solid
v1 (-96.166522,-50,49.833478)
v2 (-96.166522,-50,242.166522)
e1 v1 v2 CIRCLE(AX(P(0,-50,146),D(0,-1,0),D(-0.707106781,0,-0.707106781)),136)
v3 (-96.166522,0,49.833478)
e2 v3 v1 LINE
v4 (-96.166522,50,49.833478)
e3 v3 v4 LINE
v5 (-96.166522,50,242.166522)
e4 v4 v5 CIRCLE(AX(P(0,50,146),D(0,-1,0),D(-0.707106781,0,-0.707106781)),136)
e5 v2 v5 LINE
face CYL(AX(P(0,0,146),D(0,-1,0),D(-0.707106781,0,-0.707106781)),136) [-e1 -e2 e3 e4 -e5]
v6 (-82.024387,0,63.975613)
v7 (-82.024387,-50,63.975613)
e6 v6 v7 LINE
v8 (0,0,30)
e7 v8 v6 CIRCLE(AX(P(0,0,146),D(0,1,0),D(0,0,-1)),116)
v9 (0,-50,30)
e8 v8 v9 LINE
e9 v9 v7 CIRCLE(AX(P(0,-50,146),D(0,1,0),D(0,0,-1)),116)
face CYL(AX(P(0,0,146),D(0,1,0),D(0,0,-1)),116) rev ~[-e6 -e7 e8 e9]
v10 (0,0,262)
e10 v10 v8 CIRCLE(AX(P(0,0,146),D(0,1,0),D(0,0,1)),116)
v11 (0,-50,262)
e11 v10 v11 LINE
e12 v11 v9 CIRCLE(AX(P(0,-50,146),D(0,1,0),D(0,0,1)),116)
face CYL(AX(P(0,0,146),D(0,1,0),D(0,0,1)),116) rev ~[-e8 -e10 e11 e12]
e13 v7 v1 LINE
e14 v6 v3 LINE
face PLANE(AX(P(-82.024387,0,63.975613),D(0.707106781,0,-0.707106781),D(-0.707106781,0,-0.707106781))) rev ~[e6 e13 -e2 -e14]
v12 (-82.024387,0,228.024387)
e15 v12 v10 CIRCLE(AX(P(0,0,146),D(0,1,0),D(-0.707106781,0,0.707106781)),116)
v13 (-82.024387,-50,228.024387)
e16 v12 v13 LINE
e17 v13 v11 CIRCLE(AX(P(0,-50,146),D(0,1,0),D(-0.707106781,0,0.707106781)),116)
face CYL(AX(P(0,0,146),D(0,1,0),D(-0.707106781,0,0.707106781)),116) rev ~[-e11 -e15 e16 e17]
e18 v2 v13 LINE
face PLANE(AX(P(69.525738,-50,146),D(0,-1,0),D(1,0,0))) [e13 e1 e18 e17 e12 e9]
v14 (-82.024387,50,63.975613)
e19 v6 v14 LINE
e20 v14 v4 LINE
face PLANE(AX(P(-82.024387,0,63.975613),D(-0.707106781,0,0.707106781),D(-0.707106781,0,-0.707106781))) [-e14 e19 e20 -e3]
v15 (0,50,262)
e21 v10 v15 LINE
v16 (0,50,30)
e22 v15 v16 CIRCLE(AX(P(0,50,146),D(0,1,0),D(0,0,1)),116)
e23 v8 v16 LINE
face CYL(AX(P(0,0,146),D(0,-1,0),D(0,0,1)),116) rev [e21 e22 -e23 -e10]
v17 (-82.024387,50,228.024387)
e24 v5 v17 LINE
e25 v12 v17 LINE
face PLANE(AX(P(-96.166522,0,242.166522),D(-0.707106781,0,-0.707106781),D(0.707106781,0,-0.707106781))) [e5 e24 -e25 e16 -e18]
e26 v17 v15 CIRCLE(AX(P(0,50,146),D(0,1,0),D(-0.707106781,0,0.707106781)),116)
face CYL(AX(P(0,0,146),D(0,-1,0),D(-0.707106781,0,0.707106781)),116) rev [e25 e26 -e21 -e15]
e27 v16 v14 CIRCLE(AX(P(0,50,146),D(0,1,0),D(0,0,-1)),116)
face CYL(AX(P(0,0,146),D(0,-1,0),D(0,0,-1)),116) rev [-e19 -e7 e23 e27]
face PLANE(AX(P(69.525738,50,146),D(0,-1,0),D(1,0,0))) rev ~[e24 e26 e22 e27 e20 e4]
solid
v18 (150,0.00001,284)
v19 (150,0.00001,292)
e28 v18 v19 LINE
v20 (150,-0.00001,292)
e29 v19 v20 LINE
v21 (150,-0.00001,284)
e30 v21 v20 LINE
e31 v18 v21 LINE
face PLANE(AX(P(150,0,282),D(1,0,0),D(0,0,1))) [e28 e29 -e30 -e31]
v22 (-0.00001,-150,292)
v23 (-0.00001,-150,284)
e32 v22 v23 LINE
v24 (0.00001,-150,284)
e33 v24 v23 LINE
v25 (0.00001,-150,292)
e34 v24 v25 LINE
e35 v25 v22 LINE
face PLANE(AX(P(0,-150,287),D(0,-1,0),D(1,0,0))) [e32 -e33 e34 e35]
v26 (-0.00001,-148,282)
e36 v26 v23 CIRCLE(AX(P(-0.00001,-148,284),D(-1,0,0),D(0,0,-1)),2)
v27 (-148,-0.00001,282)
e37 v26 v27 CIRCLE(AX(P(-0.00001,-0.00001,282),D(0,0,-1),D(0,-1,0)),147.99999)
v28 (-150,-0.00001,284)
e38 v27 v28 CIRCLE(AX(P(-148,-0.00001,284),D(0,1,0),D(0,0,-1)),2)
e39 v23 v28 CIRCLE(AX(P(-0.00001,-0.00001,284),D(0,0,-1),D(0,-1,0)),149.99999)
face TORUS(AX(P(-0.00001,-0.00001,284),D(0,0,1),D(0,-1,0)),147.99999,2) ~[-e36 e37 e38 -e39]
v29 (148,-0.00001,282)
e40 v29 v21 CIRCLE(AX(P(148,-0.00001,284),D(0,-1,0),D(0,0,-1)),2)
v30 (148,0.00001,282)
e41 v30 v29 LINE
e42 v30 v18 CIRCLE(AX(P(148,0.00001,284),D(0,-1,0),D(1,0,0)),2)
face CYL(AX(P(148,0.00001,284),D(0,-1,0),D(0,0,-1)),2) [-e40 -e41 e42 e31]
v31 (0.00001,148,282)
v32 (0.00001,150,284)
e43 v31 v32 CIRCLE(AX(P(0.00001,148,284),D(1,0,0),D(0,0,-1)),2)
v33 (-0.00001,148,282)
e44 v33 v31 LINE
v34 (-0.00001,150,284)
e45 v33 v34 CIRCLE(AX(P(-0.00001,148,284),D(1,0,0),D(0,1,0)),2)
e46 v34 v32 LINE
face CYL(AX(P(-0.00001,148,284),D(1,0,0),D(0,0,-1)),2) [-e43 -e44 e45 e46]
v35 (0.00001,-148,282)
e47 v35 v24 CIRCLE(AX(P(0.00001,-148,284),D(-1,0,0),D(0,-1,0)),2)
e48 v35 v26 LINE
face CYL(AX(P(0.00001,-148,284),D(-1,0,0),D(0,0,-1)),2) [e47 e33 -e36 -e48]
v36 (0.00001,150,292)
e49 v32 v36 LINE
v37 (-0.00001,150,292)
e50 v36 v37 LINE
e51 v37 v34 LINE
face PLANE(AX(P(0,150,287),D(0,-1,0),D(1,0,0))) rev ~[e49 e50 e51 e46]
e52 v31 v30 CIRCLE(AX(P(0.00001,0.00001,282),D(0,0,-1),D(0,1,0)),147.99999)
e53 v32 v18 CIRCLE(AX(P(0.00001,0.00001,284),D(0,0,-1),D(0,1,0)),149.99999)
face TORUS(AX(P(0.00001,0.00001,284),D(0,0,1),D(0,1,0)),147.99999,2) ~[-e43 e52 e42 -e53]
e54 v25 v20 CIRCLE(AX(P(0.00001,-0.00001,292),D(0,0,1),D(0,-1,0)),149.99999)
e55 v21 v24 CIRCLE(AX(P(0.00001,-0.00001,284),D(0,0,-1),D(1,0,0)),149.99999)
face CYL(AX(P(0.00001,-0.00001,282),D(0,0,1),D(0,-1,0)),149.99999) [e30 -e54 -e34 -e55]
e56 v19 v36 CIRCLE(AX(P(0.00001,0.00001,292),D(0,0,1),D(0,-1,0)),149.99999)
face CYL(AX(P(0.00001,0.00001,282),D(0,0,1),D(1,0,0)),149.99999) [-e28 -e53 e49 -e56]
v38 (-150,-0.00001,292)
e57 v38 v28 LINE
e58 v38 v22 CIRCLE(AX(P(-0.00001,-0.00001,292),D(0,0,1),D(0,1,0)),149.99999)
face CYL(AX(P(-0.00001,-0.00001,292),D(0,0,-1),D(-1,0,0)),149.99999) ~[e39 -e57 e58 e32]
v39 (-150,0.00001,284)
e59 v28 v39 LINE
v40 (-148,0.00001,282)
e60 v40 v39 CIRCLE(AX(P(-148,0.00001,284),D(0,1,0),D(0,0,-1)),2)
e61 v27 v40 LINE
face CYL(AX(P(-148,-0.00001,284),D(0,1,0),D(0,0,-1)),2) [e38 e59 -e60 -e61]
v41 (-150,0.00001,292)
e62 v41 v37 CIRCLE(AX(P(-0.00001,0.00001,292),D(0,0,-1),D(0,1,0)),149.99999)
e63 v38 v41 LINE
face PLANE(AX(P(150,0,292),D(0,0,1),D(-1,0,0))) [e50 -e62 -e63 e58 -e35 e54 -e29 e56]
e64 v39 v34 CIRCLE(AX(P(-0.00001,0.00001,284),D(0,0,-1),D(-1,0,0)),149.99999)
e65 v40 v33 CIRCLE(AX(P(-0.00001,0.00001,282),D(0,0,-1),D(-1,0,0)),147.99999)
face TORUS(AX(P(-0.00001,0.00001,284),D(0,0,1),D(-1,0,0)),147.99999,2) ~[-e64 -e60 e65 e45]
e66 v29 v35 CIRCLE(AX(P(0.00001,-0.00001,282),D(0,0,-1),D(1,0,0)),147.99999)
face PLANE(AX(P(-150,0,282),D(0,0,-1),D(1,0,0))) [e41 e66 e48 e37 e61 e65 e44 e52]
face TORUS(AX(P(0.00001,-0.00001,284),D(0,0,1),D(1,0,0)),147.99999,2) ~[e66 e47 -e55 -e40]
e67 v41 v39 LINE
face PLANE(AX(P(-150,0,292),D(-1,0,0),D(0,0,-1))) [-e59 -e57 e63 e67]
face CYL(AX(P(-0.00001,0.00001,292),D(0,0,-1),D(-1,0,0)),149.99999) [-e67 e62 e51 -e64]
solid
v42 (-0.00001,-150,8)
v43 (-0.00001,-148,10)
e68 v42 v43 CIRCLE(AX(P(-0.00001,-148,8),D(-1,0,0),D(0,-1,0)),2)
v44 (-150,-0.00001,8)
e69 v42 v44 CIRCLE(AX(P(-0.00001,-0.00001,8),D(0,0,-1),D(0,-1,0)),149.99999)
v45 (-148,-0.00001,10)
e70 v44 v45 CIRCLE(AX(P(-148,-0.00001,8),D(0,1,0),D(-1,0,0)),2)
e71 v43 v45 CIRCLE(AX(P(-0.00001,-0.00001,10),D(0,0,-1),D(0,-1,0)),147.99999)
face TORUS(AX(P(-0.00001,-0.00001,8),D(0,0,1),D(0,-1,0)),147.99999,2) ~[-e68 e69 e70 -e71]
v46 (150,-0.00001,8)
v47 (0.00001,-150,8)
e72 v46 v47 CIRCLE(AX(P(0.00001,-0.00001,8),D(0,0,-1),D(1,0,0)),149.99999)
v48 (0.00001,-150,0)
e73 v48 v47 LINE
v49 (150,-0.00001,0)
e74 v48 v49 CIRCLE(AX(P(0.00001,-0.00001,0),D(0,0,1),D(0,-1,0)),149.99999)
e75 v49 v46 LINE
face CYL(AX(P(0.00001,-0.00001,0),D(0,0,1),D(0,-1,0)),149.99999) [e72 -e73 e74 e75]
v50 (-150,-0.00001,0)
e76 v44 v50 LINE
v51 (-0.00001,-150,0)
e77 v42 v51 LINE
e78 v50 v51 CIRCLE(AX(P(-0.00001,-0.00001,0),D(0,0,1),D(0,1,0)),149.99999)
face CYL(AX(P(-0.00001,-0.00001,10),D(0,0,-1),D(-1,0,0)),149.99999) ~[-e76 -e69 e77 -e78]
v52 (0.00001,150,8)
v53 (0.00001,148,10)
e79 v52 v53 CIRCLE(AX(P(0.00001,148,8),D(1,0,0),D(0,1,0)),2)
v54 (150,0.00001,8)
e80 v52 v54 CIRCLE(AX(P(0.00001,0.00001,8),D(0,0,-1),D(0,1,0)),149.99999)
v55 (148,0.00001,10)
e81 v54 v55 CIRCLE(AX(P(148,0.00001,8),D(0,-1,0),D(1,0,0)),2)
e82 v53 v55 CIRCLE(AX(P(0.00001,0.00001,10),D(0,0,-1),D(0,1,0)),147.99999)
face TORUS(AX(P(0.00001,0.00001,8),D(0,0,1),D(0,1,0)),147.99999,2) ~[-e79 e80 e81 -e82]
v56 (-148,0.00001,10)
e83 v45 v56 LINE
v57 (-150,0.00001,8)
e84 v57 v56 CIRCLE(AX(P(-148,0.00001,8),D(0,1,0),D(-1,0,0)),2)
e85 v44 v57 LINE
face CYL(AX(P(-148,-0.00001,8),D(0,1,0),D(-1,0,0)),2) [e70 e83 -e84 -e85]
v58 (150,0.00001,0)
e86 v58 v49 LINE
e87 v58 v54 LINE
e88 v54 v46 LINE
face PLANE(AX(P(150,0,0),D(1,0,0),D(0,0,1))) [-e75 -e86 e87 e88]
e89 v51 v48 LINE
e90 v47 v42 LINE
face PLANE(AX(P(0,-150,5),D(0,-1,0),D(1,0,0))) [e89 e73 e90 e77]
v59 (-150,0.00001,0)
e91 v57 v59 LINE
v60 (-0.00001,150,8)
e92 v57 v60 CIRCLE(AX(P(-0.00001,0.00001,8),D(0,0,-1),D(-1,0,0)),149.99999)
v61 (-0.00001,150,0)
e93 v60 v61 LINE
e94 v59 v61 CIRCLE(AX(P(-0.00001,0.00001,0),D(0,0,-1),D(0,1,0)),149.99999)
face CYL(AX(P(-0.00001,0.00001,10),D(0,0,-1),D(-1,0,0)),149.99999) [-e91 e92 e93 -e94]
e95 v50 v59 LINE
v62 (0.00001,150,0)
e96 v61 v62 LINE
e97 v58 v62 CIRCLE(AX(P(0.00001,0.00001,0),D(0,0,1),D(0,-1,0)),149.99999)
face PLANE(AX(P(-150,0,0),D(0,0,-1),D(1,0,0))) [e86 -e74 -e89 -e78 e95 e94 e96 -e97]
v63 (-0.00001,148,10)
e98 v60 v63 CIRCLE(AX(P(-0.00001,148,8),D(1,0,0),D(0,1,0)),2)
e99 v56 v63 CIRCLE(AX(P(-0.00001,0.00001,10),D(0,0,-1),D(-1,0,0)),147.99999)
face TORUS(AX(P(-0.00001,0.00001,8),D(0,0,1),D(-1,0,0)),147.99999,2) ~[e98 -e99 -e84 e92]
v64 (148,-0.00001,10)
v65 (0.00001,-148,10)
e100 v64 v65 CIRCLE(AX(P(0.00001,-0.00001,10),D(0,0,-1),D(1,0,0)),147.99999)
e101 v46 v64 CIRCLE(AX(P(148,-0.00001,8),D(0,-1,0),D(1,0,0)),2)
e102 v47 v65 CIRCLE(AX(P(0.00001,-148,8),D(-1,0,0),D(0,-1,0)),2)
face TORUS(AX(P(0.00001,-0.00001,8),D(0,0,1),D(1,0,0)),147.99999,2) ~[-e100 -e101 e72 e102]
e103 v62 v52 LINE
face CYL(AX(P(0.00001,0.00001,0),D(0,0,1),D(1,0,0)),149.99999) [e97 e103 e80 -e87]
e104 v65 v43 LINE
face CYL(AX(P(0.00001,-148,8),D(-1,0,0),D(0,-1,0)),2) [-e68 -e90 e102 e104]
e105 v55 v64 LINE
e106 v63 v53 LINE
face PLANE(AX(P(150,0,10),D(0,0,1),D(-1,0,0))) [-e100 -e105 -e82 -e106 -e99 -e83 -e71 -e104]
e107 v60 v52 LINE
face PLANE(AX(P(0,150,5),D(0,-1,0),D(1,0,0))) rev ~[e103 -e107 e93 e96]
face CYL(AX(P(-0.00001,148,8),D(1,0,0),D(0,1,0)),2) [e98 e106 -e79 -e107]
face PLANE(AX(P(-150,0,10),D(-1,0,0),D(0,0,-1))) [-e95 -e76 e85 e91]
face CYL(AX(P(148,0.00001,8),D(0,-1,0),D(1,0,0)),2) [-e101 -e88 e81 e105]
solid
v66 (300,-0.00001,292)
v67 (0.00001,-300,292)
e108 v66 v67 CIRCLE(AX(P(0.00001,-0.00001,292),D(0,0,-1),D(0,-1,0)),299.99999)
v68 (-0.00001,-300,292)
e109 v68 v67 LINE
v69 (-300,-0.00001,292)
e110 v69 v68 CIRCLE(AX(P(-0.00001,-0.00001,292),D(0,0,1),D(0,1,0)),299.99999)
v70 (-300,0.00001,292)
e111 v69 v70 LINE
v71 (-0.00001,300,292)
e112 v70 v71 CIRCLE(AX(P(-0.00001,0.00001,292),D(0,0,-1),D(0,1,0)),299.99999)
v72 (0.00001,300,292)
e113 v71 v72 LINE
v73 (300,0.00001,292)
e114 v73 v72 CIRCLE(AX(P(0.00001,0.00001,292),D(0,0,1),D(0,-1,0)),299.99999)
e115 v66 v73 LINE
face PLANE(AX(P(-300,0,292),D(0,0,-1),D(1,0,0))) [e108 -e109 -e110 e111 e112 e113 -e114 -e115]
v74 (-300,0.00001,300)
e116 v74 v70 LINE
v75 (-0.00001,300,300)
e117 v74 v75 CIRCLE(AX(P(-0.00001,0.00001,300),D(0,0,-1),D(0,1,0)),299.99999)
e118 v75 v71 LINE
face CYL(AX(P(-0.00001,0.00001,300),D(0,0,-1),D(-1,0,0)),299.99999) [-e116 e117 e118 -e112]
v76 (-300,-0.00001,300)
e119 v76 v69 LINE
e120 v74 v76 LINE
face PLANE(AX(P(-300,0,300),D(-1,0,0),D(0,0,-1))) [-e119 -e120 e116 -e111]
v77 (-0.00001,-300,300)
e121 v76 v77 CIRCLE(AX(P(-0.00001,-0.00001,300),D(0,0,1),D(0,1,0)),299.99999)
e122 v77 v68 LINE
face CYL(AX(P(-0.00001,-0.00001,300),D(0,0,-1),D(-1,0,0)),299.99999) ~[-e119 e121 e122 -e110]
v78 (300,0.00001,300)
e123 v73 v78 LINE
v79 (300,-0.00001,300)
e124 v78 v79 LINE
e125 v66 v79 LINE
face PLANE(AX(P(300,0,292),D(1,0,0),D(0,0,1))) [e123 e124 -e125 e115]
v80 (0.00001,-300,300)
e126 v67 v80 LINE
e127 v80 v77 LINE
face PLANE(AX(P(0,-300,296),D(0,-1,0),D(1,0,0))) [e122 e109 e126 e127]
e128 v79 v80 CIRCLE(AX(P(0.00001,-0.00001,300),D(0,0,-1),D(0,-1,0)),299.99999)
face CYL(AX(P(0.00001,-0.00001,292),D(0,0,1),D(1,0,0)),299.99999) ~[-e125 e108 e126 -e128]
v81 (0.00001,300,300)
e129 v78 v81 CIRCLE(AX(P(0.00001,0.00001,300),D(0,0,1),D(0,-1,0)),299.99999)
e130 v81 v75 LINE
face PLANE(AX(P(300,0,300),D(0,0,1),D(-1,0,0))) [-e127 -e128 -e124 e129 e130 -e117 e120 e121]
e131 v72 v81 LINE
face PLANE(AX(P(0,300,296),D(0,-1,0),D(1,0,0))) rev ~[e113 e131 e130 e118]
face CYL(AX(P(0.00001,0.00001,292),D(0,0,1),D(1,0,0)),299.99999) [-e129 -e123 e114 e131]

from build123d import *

# Parameters (mm, degrees)
F1_DEPTH      = 300
F1_DEPTH_BACK = 300
F2_DEPTH      = 150
F2_DEPTH_BACK = 150
F3_DEPTH      = 50
F3_DEPTH_BACK = 50
F4_R          = 299.99999
F5_R          = 149.99999
F5_2_R        = 149.99999
F6_R          = 2
F6_2_R        = 2


# Not quite as in the source:
# - a fillet or chamfer is up to 0.001 mm smaller than in the source, because OpenCascade refuses the exact size


with BuildPart() as f1:
    # F0 (on Front) → F1 (new body, two sides)
    with BuildSketch(Plane.XZ) as f1_sk:
        Polygon((-150, 292), (150, 292), (300, 292), (300, 300), (-300, 300), (-300, 292), align=None)
    extrude(amount=F1_DEPTH)
    extrude(f1_sk.sketch, amount=-F1_DEPTH_BACK)

    # F4 (radius 300 in the source; OpenCascade refuses exactly that, so slightly less here)
    f4_edges = [f1.edges().sort_by_distance(p)[0] for p in [
        (-300, 300, 296),
        (-300, -300, 296),
        (300, 300, 296),
        (300, -300, 296),
    ]]
    fillet(f4_edges, radius=F4_R)


with BuildPart() as f2:
    # F0 (on Front) → F2 (new body, two sides)
    with BuildSketch(Plane.XZ) as f2_sk:
        Polygon((-150, 282), (0, 282), (150, 282), (150, 292), (-150, 292), align=None)
    extrude(amount=F2_DEPTH)
    extrude(f2_sk.sketch, amount=-F2_DEPTH_BACK)

    # F5 (radius 150 in the source; OpenCascade refuses exactly that, so slightly less here)
    f5_edges = [f2.edges().sort_by_distance(p)[0] for p in [
        (150, -150, 287),
        (150, 150, 287),
        (-150, 150, 287),
        (-150, -150, 287),
    ]]
    fillet(f5_edges, radius=F5_R)

    # F6
    f6_edges = [f2.edges().sort_by_distance(p)[0] for p in [
        (-150, 0, 282),
        (-106.06602, -106.06602, 282),
        (-106.06602, 106.06602, 282),
        (0, -150, 282),
        (0, 150, 282),
        (106.06602, -106.06602, 282),
        (106.06602, 106.06602, 282),
        (150, 0, 282),
    ]]
    fillet(f6_edges, radius=F6_R)


with BuildPart() as f2b:
    # F0 (on Front) → F2, piece 2 (new body, two sides)
    with BuildSketch(Plane.XZ) as f2_2_sk:
        Polygon((-150, 0), (0, 0), (150, 0), (150, 10), (0, 10), (-150, 10), align=None)
    extrude(amount=F2_DEPTH)
    extrude(f2_2_sk.sketch, amount=-F2_DEPTH_BACK)

    # F5#2 (radius 150 in the source; OpenCascade refuses exactly that, so slightly less here)
    f5_2_edges = [f2b.edges().sort_by_distance(p)[0] for p in [
        (150, -150, 5),
        (150, 150, 5),
        (-150, -150, 5),
        (-150, 150, 5),
    ]]
    fillet(f5_2_edges, radius=F5_2_R)

    # F6#2
    f6_2_edges = [f2b.edges().sort_by_distance(p)[0] for p in [
        (0, -150, 10),
        (-106.06602, -106.06602, 10),
        (106.06602, -106.06602, 10),
        (-150, 0, 10),
        (150, 0, 10),
        (-106.06602, 106.06602, 10),
        (106.06602, 106.06602, 10),
        (0, 150, 10),
    ]]
    fillet(f6_2_edges, radius=F6_2_R)


with BuildPart() as f3:
    # F0 (on Front) → F3 (new body, two sides)
    with BuildSketch(Plane.XZ) as f3_sk:
        with BuildLine():
            Line((0, 30), (0, 10))
            ThreePointArc((0, 10), (136, 146), (0, 282))
            Line((0, 282), (0, 262))
            ThreePointArc((0, 262), (116, 146), (0, 30))
        make_face()
        with BuildLine():
            Line((0, 262), (0, 282))
            ThreePointArc((0, 282), (-52.0449468017, 271.6476164215), (-96.1665222414, 242.1665222414))
            Line((-96.1665222414, 242.1665222414), (-82.0243866176, 228.0243866176))
            ThreePointArc((-82.0243866176, 228.0243866176), (-44.3912781544, 253.1700257713), (0, 262))
        make_face()
        with BuildLine():
            ThreePointArc((-96.1665222414, 49.8334777586), (-52.0449468017, 20.3523835785), (0, 10))
            Line((0, 10), (0, 30))
            ThreePointArc((0, 30), (-44.3912781544, 38.8299742287), (-82.0243866176, 63.9756133824))
            Line((-82.0243866176, 63.9756133824), (-96.1665222414, 49.8334777586))
        make_face()
    extrude(amount=F3_DEPTH)
    extrude(f3_sk.sketch, amount=-F3_DEPTH_BACK)


solid = Compound([f1.part, f2.part, f2b.part, f3.part])
